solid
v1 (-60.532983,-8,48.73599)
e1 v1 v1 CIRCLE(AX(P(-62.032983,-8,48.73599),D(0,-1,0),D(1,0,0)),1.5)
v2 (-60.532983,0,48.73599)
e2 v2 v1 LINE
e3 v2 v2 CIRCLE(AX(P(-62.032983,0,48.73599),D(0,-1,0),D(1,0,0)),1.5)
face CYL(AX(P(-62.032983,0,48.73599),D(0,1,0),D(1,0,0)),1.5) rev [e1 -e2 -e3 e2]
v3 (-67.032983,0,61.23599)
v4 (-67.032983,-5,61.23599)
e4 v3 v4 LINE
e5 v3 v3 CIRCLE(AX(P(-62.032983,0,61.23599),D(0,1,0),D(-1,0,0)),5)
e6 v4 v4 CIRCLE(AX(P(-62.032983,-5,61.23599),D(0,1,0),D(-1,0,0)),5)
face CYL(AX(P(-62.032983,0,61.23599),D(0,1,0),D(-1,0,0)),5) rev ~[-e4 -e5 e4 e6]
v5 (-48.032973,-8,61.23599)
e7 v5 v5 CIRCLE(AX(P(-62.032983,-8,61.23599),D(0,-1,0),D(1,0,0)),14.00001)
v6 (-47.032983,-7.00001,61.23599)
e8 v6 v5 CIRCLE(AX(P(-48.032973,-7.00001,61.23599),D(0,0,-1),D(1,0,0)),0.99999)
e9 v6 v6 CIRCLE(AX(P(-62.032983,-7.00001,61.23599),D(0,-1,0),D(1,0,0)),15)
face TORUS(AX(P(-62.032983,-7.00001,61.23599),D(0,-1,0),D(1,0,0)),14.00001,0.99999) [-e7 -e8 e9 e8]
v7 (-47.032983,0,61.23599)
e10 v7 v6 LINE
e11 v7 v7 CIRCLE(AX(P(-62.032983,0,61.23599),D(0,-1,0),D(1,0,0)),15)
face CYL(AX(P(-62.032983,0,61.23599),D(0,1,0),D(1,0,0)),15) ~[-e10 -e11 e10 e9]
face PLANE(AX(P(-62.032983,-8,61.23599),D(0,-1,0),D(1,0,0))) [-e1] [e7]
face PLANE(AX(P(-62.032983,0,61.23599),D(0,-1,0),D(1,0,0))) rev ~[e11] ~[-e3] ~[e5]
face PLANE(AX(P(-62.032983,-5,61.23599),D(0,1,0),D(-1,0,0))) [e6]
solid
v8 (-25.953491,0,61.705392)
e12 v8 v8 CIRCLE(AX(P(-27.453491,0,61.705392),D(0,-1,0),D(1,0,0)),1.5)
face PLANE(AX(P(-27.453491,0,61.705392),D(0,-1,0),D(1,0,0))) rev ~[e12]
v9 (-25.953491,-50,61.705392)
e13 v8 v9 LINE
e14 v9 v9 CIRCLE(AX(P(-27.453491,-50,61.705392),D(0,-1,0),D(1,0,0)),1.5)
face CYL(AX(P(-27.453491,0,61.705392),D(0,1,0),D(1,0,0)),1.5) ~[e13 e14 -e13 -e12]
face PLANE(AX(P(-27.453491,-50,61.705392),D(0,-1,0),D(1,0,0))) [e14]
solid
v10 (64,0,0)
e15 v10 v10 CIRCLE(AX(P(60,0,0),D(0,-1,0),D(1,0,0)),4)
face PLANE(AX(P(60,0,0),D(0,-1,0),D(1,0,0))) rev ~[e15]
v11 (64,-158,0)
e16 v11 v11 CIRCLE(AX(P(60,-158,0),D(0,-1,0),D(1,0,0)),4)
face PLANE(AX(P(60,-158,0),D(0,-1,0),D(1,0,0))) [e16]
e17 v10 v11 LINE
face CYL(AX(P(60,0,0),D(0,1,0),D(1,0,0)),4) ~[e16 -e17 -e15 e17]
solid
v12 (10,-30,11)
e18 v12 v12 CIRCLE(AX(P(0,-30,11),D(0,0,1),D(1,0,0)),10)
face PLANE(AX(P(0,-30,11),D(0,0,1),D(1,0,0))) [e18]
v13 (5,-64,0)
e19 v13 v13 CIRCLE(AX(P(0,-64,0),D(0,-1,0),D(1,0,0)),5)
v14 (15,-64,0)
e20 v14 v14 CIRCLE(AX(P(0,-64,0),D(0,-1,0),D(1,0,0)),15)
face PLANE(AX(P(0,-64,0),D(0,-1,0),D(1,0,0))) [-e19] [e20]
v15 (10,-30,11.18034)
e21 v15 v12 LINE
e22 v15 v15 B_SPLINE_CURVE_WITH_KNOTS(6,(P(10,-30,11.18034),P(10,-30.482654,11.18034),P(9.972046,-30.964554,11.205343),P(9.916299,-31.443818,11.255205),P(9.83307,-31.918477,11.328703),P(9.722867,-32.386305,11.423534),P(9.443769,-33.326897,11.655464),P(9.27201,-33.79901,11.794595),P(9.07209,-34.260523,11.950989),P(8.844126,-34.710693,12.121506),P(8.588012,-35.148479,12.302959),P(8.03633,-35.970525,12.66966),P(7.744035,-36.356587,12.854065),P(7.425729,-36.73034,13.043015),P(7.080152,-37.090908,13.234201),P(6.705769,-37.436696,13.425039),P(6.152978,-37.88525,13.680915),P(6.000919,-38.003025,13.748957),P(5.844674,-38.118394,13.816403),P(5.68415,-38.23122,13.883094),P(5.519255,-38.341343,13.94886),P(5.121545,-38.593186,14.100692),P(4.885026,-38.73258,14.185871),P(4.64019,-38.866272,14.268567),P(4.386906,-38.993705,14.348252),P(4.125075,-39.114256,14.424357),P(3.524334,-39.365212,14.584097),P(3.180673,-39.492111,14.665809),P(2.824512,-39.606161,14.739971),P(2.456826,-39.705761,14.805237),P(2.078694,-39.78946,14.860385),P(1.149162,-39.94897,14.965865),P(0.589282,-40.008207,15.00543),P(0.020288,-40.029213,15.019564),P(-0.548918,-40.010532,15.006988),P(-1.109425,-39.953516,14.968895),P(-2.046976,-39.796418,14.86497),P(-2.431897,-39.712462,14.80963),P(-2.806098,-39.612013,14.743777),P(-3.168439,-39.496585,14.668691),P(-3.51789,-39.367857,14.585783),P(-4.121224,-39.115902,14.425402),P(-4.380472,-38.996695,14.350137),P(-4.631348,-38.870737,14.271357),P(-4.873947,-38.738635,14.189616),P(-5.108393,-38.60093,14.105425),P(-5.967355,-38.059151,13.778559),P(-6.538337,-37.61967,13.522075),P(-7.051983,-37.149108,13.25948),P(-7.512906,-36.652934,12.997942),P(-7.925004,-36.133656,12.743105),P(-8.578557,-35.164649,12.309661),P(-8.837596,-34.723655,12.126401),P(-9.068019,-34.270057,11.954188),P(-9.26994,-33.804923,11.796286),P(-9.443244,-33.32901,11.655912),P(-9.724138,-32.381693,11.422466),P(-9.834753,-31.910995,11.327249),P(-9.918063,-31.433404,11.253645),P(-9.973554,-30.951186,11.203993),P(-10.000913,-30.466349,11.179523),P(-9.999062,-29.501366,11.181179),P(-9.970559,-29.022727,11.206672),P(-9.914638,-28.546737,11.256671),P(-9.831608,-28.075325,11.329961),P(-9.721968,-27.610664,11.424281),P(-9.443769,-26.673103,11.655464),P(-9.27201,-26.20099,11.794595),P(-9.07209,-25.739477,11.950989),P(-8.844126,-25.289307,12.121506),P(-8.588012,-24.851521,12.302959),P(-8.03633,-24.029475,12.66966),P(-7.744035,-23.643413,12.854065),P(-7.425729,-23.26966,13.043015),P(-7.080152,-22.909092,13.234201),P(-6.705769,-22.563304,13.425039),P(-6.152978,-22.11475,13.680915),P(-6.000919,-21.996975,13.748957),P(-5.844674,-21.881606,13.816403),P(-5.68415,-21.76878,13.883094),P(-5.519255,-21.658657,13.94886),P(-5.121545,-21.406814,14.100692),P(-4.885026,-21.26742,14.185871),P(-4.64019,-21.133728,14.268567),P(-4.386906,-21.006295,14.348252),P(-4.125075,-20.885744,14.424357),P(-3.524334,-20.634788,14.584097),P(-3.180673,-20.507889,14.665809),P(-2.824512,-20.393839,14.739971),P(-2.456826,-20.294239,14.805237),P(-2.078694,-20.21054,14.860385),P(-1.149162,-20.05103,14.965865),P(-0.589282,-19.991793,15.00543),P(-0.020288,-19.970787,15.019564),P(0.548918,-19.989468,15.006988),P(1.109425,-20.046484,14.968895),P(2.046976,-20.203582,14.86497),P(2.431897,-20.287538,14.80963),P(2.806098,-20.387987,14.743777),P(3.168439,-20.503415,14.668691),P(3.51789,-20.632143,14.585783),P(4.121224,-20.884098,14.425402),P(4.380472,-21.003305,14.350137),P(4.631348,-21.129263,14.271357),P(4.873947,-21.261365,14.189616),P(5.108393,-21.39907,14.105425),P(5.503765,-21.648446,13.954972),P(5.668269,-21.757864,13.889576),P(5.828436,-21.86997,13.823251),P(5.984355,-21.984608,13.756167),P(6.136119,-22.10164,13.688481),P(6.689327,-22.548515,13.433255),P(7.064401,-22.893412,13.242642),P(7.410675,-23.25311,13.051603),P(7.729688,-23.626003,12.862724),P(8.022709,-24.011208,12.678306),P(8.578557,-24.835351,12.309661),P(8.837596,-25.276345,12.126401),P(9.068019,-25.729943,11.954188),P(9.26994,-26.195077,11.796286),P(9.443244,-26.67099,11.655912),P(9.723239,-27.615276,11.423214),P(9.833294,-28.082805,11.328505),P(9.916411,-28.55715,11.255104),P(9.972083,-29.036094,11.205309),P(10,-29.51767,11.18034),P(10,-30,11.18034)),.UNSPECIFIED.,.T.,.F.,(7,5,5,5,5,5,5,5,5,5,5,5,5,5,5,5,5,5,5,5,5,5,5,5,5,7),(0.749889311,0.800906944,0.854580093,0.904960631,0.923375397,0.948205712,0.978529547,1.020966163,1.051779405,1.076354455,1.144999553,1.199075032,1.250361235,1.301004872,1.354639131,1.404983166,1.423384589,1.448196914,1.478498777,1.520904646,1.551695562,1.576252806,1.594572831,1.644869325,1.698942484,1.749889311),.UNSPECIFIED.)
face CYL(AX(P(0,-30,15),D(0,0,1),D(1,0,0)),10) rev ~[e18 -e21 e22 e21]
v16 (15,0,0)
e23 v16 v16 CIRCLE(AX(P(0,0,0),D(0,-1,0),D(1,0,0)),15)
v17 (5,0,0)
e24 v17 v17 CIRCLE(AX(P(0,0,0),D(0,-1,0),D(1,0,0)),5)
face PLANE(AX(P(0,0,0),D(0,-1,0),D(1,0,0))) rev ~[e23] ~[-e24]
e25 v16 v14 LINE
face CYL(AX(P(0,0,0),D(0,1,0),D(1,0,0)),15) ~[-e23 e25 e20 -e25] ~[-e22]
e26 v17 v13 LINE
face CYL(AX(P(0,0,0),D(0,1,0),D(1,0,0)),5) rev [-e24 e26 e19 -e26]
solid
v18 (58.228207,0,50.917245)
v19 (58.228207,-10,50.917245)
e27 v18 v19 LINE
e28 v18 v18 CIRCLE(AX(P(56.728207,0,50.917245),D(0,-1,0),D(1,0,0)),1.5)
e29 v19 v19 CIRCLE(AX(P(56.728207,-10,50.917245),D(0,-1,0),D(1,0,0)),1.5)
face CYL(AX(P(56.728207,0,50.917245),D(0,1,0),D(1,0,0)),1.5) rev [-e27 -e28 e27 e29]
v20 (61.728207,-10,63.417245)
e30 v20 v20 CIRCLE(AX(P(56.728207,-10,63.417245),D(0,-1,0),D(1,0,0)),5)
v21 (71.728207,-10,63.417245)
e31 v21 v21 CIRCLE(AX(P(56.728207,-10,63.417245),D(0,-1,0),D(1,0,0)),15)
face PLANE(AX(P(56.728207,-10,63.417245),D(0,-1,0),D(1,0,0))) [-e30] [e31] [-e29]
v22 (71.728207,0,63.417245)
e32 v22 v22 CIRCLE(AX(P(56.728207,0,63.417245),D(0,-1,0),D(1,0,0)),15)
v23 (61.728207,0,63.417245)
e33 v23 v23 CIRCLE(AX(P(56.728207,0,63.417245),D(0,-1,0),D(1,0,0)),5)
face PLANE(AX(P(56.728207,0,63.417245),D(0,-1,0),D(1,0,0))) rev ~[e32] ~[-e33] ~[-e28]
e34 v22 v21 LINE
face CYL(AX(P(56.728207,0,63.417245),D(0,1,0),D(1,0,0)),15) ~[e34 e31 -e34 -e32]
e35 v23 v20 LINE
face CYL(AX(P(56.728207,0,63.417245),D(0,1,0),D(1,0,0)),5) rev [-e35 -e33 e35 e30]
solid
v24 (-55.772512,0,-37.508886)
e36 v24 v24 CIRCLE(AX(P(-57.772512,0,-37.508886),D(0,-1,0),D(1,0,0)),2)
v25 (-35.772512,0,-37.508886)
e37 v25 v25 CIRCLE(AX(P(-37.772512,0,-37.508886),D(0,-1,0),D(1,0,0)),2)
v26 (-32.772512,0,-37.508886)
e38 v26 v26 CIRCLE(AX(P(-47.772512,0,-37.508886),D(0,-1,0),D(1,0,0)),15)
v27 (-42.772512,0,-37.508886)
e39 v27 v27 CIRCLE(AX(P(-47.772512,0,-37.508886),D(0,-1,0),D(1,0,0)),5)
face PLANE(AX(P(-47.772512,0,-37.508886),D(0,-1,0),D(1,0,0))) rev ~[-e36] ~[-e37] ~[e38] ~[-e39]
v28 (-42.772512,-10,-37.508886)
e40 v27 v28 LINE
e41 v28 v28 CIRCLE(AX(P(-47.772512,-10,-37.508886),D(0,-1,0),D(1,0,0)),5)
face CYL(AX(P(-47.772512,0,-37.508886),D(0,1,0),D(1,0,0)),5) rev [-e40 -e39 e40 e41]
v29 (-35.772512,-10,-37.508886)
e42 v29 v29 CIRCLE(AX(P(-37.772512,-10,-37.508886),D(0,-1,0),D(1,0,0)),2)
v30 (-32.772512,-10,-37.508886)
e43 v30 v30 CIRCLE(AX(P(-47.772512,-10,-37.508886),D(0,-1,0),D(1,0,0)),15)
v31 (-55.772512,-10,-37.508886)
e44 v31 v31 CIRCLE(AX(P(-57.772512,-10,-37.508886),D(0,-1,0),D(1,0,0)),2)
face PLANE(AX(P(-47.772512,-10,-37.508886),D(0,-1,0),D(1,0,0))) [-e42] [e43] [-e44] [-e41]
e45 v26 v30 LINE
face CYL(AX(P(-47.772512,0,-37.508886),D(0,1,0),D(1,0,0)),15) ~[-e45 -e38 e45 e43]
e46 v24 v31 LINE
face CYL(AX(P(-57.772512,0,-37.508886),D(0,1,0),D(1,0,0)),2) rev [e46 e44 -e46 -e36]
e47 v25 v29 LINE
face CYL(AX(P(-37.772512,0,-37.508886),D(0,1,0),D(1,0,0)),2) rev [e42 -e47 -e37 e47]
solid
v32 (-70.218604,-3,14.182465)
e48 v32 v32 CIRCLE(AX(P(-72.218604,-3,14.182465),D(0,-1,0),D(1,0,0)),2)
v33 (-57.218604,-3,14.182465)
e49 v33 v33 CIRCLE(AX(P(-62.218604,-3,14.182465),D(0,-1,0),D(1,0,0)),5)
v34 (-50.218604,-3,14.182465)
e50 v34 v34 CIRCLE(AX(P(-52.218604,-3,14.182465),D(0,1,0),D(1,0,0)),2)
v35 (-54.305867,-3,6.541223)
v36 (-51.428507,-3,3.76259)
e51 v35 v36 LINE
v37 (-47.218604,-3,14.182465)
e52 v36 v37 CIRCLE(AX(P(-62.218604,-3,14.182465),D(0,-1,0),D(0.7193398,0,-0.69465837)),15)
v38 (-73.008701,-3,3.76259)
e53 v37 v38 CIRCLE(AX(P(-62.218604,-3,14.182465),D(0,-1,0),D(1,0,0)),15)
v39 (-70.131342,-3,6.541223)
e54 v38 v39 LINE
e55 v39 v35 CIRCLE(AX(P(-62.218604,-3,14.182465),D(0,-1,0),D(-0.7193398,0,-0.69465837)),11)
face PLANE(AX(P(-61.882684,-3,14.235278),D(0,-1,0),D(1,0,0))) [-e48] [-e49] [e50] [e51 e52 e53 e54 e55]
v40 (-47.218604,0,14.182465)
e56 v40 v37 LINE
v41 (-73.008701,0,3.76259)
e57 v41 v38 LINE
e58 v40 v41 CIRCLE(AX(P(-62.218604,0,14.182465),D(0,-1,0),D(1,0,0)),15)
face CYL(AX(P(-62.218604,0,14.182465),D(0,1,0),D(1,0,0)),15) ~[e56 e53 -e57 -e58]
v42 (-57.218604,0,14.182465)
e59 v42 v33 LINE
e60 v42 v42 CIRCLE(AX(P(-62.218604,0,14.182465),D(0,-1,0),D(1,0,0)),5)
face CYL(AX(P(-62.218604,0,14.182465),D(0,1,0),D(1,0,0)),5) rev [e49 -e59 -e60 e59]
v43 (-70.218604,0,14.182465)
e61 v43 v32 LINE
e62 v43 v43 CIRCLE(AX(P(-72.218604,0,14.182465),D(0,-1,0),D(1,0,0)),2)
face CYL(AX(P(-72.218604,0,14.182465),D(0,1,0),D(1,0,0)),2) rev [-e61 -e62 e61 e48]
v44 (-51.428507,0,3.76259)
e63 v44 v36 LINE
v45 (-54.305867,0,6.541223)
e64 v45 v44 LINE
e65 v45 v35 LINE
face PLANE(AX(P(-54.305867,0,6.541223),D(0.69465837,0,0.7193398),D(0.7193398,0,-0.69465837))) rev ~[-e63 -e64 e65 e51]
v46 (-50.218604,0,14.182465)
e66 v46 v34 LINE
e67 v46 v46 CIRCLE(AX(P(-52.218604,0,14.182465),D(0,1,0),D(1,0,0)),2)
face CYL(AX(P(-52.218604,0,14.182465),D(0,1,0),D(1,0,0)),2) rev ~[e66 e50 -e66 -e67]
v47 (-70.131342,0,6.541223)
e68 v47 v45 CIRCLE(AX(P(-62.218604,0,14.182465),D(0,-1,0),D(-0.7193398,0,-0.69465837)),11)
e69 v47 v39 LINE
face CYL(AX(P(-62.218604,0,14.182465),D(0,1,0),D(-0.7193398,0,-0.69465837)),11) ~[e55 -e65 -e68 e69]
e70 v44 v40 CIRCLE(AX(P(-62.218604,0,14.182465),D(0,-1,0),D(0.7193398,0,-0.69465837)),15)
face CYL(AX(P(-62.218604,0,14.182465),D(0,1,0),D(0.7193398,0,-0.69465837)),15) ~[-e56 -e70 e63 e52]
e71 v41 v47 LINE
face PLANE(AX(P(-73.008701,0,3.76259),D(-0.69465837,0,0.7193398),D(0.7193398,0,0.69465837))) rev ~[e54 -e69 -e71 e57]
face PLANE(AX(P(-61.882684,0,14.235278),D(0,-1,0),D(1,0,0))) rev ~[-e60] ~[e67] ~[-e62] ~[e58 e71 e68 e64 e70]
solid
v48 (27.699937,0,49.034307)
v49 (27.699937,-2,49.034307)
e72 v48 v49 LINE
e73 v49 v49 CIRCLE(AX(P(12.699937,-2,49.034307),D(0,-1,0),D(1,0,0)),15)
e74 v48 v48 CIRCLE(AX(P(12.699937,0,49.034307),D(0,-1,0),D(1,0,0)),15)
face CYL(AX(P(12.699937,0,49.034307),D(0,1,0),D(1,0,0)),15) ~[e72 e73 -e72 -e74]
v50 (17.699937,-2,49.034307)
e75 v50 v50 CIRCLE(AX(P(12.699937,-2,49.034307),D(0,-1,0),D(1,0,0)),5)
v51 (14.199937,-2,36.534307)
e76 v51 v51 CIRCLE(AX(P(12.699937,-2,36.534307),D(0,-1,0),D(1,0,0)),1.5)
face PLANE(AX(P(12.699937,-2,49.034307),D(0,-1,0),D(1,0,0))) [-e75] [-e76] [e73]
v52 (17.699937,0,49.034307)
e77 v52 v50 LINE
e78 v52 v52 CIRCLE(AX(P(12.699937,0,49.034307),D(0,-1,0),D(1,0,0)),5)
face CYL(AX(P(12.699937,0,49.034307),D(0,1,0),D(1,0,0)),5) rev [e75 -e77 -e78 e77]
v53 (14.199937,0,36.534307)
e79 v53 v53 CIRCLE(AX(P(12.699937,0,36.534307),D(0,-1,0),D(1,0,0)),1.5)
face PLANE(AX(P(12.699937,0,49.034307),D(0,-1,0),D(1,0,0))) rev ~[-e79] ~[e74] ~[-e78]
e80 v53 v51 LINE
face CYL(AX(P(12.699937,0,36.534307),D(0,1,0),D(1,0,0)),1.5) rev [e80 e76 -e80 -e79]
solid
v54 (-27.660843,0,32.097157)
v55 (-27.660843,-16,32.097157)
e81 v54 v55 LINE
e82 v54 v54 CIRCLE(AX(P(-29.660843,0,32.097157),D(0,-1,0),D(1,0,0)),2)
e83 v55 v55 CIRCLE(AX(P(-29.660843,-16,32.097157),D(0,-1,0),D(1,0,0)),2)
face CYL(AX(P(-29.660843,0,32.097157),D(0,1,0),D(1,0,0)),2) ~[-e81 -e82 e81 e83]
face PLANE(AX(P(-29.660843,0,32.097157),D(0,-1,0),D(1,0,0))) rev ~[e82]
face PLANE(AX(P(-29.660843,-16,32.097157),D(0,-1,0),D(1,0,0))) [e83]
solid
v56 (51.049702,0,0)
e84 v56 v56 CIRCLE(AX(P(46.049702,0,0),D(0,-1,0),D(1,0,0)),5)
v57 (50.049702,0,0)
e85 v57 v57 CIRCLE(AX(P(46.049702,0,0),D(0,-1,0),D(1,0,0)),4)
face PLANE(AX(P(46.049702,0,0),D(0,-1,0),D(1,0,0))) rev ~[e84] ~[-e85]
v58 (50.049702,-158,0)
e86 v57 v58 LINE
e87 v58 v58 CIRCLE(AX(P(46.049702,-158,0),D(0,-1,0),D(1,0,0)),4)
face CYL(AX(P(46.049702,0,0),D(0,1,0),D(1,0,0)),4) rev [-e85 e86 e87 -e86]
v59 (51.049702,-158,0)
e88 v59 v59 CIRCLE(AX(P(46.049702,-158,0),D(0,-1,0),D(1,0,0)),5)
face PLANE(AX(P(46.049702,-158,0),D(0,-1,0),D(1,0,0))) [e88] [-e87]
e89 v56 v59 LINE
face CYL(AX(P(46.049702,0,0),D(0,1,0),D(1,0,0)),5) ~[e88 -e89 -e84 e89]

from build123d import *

# Parameters (mm, degrees)
F0_R      = 15
F0_R_2    = 5
F1_DEPTH  = 64
F2_R      = 2
F2_R_2    = 5
F3_DEPTH  = 3
F4_R      = 15
F4_R_2    = 2
F4_R_3    = 5
F5_DEPTH  = 10
F6_R      = 15
F6_R_2    = 1.5
F6_R_3    = 5
F7_DEPTH  = 2
F9_R      = 10
F10_DEPTH = 4
F11_R     = 5
F11_R_2   = 4
F12_DEPTH = 158
F13_R     = 4
F14_DEPTH = 158
F15_R     = 2
F16_DEPTH = 16
F17_R     = 15
F17_R_2   = 1.5
F18_DEPTH = 8
F19_R     = 1.5
F20_DEPTH = 50
F21_R     = 0.99999
F17_R_3   = 5
F22_DEPTH = 10
F23_R     = 5
F24_DEPTH = 5


# Not quite as in the source:
# - a fillet or chamfer is up to 0.001 mm smaller than in the source, because OpenCascade refuses the exact size
# - a feature names something its author has since deleted; it is built from what else it names


with BuildPart() as f1:
    # F0 (on Front) → F1 (new body)
    with BuildSketch(Plane.XZ):
        Circle(F0_R)
        Circle(F0_R_2, mode=Mode.SUBTRACT)
    extrude(amount=F1_DEPTH)

    # F9 (on offset) → F10 (cut)
    with BuildSketch(Plane.XY.offset(15)):
        with Locations((0, -30)):
            Circle(F9_R)
    extrude(amount=-F10_DEPTH, mode=Mode.SUBTRACT)


with BuildPart() as f3:
    # F2 (on Front) → F3 (new body)
    with BuildSketch(Plane.XZ):
        with BuildLine():
            Line((-54.3058665821, 6.5412230759), (-51.4285073808, 3.7625895941))
            ThreePointArc((-51.4285073808, 3.7625895941), (-48.3108465674, 8.5633662497), (-47.2186043859, 14.182465151))
            ThreePointArc((-47.2186043859, 14.182465151), (-67.8377032871, 28.0902229695), (-73.0087013909, 3.7625895941))
            Line((-73.0087013909, 3.7625895941), (-70.1313421896, 6.5412230759))
            ThreePointArc((-70.1313421896, 6.5412230759), (-62.2186043859, 3.182465151), (-54.3058665821, 6.5412230759))
        make_face()
        with Locations((-72.2186043859, 14.182465151)):
            Circle(F2_R, mode=Mode.SUBTRACT)
        with Locations((-62.2186043859, 14.182465151)):
            Circle(F2_R_2, mode=Mode.SUBTRACT)
        with BuildLine():
            ThreePointArc((-54.2186043859, 14.182465151), (-52.2186043859, 16.182465151), (-50.2186043859, 14.182465151))
            ThreePointArc((-50.2186043859, 14.182465151), (-52.2186043859, 12.182465151), (-54.2186043859, 14.182465151))
        make_face(mode=Mode.SUBTRACT)
    extrude(amount=F3_DEPTH)


with BuildPart() as f5:
    # F4 (on Front) → F5 (new body)
    with BuildSketch(Plane.XZ):
        with Locations((-47.7725118399, -37.5088863075)):
            Circle(F4_R)
        with Locations((-57.7725118399, -37.5088863075)):
            Circle(F4_R_2, mode=Mode.SUBTRACT)
        with Locations((-47.7725118399, -37.5088863075)):
            Circle(F4_R_3, mode=Mode.SUBTRACT)
        with Locations((-37.7725118399, -37.5088863075)):
            Circle(F4_R_2, mode=Mode.SUBTRACT)
    extrude(amount=F5_DEPTH)


with BuildPart() as f7:
    # F6 (on Front) → F7 (new body)
    with BuildSketch(Plane.XZ):
        with Locations((12.6999374479, 49.0343069208)):
            Circle(F6_R)
        with Locations((12.6999374479, 36.5343069208)):
            Circle(F6_R_2, mode=Mode.SUBTRACT)
        with Locations((12.6999374479, 49.0343069208)):
            Circle(F6_R_3, mode=Mode.SUBTRACT)
    extrude(amount=F7_DEPTH)


with BuildPart() as f12:
    # F11 (on Front) → F12 (new body)
    with BuildSketch(Plane.XZ):
        with Locations((46.0497015125, 0)):
            Circle(F11_R)
        with Locations((46.0497015125, 0)):
            Circle(F11_R_2, mode=Mode.SUBTRACT)
    extrude(amount=F12_DEPTH)


with BuildPart() as f14:
    # F13 (on Front) → F14 (new body)
    with BuildSketch(Plane.XZ):
        with Locations((60, 0)):
            Circle(F13_R)
    extrude(amount=F14_DEPTH)


with BuildPart() as f16:
    # F15 (on Front) → F16 (new body)
    with BuildSketch(Plane.XZ):
        with Locations((-29.6608433127, 32.0971570909)):
            Circle(F15_R)
    extrude(amount=F16_DEPTH)


with BuildPart() as f18:
    # F17 (on Front) → F18 (new body)
    with BuildSketch(Plane.XZ):
        with Locations((-62.032982707, 61.2359903753)):
            Circle(F17_R)
        with Locations((-62.032982707, 48.7359903753)):
            Circle(F17_R_2, mode=Mode.SUBTRACT)
    extrude(amount=F18_DEPTH)

    # F21 (radius 1 in the source; OpenCascade refuses exactly that, so slightly less here)
    f21_edges = [f18.edges().sort_by_distance(p)[0] for p in [
        (-77.032983, -8, 61.23599),
    ]]
    fillet(f21_edges, radius=F21_R)

    # F23 (on face) → F24 (cut)
    with BuildSketch(Plane(origin=(0, 0, 0), x_dir=(-1, 0, 0), z_dir=(0, 1, 0))):
        with Locations((62.032982707, 61.2359903753)):
            Circle(F23_R)
    extrude(amount=-F24_DEPTH, mode=Mode.SUBTRACT)


with BuildPart() as f20:
    # F19 (on Front) → F20 (new body)
    with BuildSketch(Plane.XZ):
        with Locations((-27.4534914643, 61.705391854)):
            Circle(F19_R)
    extrude(amount=F20_DEPTH)


with BuildPart() as f22:
    # F17 (on Front) → F22 (new body)
    with BuildSketch(Plane.XZ):
        with Locations((56.7282065749, 63.4172449509)):
            Circle(F17_R)
        with Locations((56.7282065749, 50.9172449509)):
            Circle(F17_R_2, mode=Mode.SUBTRACT)
        with Locations((56.7282065749, 63.4172449509)):
            Circle(F17_R_3, mode=Mode.SUBTRACT)
    extrude(amount=F22_DEPTH)


solid = Compound([f1.part, f3.part, f5.part, f7.part, f12.part, f14.part, f16.part, f18.part, f20.part, f22.part])
